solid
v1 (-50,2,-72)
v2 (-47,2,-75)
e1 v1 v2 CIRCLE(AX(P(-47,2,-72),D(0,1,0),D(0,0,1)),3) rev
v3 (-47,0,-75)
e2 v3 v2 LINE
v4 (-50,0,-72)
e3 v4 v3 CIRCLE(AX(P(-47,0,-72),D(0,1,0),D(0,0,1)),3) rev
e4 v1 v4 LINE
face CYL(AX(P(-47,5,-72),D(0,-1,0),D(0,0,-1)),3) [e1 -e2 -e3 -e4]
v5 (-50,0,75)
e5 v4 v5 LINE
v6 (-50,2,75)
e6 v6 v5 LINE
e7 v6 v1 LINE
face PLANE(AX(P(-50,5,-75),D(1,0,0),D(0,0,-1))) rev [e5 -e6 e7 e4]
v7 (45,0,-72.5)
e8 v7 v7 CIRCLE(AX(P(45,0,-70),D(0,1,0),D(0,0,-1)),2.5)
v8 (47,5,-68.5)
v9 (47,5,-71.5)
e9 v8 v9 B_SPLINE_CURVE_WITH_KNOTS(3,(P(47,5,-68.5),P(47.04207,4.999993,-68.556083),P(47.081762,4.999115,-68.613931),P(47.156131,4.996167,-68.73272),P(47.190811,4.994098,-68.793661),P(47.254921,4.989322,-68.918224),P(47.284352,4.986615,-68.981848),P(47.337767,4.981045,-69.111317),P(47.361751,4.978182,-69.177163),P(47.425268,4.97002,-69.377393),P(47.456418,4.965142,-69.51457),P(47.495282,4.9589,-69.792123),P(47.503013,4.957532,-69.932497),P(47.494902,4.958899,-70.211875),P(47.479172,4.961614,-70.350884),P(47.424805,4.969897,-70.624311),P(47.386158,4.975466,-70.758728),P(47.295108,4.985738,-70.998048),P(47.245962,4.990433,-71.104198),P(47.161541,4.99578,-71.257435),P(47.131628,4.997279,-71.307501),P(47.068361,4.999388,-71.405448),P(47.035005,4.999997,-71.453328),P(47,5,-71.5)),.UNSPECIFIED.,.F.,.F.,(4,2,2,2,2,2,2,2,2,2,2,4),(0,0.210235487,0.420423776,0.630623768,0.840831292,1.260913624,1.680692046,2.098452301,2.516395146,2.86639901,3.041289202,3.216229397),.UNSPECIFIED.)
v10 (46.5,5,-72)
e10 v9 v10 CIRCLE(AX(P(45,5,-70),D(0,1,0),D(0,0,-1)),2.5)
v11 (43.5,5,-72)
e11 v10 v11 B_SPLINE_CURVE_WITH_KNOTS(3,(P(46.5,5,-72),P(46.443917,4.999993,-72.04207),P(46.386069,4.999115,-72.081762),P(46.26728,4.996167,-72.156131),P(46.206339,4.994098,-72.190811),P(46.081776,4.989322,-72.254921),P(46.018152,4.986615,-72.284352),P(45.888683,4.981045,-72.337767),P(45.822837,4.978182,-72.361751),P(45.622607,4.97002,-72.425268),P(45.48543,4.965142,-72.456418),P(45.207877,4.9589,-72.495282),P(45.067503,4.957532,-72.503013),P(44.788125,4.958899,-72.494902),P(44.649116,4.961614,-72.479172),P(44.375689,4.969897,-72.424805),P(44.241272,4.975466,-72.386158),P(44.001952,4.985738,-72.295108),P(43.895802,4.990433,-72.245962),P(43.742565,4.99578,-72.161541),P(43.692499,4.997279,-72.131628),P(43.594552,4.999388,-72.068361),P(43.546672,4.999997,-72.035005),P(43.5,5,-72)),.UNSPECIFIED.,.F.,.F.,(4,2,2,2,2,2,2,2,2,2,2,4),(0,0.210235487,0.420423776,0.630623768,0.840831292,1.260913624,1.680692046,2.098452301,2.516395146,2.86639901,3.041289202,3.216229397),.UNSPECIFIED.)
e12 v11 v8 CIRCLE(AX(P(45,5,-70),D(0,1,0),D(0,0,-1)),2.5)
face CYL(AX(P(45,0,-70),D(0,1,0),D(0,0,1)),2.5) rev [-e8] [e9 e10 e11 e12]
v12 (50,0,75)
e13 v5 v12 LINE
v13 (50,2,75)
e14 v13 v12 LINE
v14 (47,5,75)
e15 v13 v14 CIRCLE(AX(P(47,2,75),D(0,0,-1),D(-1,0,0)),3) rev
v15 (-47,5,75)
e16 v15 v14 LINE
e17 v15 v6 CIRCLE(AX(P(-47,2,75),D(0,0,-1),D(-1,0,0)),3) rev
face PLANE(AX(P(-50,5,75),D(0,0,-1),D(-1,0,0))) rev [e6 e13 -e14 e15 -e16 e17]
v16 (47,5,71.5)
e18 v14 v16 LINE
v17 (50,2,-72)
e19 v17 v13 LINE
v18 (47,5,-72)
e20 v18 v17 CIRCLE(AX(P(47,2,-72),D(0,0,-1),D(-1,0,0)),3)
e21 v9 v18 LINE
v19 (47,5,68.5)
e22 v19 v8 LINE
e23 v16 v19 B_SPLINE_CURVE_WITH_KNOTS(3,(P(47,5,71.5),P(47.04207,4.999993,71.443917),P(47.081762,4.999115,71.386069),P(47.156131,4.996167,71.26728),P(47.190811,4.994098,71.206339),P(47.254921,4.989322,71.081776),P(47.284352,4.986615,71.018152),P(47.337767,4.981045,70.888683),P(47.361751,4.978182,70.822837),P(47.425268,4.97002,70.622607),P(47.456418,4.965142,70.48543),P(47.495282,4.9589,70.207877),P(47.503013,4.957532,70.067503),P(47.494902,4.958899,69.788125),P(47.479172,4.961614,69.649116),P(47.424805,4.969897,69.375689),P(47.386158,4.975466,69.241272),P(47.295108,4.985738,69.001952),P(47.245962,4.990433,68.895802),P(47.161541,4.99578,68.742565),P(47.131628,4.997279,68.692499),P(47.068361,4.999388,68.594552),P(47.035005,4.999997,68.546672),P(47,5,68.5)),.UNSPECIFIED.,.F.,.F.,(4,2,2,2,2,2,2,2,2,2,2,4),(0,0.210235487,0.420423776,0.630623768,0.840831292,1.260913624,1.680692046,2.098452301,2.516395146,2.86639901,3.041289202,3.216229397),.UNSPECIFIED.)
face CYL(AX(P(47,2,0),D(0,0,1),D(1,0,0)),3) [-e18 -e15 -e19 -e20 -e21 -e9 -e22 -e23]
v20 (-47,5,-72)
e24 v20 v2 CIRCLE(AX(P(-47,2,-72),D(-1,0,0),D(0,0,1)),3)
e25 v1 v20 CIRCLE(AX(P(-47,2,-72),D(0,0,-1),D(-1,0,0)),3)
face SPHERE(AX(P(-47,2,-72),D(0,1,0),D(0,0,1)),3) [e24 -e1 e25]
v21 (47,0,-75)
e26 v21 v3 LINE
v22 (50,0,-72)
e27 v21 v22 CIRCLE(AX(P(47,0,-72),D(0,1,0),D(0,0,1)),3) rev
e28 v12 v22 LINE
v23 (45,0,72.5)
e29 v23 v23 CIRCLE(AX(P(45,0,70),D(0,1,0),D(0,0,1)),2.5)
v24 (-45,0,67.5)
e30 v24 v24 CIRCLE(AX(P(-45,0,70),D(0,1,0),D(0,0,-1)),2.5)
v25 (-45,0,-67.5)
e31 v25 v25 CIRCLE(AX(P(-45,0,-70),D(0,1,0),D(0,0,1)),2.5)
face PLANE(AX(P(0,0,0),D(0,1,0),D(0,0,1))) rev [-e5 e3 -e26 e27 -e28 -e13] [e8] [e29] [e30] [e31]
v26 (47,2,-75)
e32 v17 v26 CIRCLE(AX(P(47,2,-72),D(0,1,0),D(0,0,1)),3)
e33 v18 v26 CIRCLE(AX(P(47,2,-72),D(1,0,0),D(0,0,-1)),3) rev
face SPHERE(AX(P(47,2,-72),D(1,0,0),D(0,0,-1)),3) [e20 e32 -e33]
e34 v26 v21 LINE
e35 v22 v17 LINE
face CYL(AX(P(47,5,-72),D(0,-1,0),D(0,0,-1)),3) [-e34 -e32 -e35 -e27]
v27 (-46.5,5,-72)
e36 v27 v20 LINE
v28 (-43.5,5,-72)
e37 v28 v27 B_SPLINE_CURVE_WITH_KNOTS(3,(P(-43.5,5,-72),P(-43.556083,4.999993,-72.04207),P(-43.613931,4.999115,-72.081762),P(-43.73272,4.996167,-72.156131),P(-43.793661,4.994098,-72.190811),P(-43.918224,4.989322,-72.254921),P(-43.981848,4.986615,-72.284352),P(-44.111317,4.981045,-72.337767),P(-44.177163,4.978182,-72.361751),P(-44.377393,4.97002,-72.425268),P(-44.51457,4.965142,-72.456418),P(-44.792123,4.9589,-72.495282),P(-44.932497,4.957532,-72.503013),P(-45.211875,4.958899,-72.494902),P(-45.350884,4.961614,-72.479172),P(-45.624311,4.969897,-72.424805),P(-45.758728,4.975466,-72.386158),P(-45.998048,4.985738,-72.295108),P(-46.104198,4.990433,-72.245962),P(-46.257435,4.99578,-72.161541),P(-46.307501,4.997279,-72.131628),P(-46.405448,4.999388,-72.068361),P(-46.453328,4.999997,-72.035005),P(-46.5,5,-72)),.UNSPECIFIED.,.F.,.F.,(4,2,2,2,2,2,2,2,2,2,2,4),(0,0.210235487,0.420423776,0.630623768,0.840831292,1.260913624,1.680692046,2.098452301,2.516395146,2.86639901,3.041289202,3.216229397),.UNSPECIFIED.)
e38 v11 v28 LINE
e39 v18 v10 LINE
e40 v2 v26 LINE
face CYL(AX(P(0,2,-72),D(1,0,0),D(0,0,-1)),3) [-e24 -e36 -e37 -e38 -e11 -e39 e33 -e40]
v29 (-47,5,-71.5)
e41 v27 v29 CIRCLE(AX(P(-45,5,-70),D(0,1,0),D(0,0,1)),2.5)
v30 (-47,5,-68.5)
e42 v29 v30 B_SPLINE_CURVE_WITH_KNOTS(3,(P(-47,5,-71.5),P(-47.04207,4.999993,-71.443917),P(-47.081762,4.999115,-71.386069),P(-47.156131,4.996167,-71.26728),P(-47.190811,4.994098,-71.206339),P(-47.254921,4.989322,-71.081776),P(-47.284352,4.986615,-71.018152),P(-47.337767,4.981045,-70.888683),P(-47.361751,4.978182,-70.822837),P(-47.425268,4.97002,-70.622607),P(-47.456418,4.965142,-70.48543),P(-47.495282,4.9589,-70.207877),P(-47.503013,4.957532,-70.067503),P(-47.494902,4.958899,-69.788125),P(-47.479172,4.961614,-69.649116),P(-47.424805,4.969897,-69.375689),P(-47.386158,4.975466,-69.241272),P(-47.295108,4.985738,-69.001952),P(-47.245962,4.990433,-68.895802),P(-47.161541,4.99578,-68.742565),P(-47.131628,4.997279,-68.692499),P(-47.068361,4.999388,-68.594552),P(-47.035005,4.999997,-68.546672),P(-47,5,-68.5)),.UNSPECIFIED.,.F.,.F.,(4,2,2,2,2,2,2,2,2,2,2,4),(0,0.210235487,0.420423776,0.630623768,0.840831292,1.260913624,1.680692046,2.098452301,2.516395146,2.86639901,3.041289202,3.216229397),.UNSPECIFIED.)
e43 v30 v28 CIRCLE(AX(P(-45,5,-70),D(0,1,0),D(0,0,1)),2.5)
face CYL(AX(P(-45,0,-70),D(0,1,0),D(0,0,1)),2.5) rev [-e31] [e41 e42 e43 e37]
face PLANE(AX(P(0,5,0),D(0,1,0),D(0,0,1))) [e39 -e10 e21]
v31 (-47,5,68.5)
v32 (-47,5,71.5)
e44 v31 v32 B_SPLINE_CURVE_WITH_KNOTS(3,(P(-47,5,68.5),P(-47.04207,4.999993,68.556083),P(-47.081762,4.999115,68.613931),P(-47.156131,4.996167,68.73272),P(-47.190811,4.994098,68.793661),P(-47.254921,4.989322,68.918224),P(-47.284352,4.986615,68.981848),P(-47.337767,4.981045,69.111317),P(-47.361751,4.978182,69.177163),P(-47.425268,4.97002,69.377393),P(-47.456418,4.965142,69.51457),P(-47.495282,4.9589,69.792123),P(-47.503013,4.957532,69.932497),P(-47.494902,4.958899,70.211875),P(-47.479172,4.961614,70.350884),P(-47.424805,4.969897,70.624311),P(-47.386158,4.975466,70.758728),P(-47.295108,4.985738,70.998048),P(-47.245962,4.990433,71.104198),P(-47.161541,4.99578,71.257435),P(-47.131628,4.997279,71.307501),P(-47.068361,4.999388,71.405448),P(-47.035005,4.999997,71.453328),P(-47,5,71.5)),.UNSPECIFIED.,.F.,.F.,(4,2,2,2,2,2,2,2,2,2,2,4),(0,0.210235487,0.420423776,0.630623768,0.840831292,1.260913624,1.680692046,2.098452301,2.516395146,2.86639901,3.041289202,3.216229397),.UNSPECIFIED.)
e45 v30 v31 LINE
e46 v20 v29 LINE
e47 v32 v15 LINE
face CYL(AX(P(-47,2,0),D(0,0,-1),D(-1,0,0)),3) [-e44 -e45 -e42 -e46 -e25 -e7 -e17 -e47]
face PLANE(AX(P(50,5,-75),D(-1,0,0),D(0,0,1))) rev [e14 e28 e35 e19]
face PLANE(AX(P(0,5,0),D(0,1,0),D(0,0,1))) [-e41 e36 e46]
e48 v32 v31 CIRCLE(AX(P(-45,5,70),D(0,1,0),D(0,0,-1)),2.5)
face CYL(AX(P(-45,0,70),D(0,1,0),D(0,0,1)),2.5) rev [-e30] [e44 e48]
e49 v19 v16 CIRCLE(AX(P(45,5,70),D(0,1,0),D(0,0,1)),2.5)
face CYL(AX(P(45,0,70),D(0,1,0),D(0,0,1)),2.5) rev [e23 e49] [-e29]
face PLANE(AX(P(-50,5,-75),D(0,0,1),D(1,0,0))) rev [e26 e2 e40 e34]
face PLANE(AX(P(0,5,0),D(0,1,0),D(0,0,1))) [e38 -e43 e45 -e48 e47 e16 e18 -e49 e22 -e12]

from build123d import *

# Parameters (mm, degrees)
SKETCH1_W           = 100
SKETCH1_H           = 150
BOSS_EXTRUDE1_DEPTH = 5
SKETCH2_R           = 2.5
CUT_EXTRUDE1_DEPTH  = 91.277350426
FILLET1_R           = 3


with BuildPart() as part:
    # Sketch1 → Boss-Extrude1 (new body)
    with BuildSketch(Plane(origin=(0, 0, 0), x_dir=(1, 0, 0), z_dir=(0, 1, 0))):
        Rectangle(SKETCH1_W, SKETCH1_H)
    extrude(amount=BOSS_EXTRUDE1_DEPTH)

    # Sketch2 → Cut-Extrude1 (cut, through all)
    with BuildSketch(Plane(origin=(0, 5, 0), x_dir=(1, 0, 0), z_dir=(0, 1, 0))):
        with Locations(Location((-45, 70, 0), (0, 0, 270))):
            Circle(SKETCH2_R)
        with Locations(Location((45, 70, 0), (0, 0, 90))):
            Circle(SKETCH2_R)
        with Locations(Location((45, -70, 0), (0, 0, 270))):
            Circle(SKETCH2_R)
        with Locations(Location((-45, -70, 0), (0, 0, 90))):
            Circle(SKETCH2_R)
    extrude(amount=-CUT_EXTRUDE1_DEPTH, mode=Mode.SUBTRACT)

    # Fillet1
    # the kernel refuses this fillet: 3 mm, written as the material it takes off along each edge
    with BuildSketch(Plane(origin=(-47, 2, -72), x_dir=(-1, 0, 0), z_dir=(0, 0, -1))) as fillet1_piece_1_section:
        Polygon((0, 0), (FILLET1_R, 0), (FILLET1_R, FILLET1_R), (0, FILLET1_R), align=None)
    fillet1_piece_1 = extrude(amount=FILLET1_R, mode=Mode.PRIVATE)
    fillet1_piece_1 = fillet1_piece_1 - Plane(origin=(-47, 2, -72), x_dir=(0.7071067811865475, -0.7071067811865475, 0), z_dir=(0, 0, -1)) * Sphere(FILLET1_R, mode=Mode.PRIVATE)
    add(fillet1_piece_1, mode=Mode.SUBTRACT)
    with BuildSketch(Plane(origin=(47, 2, -72), x_dir=(1, 0, 0), z_dir=(0, 0, -1))) as fillet1_piece_2_section:
        Polygon((0, 0), (FILLET1_R, 0), (FILLET1_R, -FILLET1_R), (0, -FILLET1_R), align=None)
    fillet1_piece_2 = extrude(amount=FILLET1_R, mode=Mode.PRIVATE)
    fillet1_piece_2 = fillet1_piece_2 - Plane(origin=(47, 2, -72), x_dir=(-0.7071067811865475, -0.7071067811865475, 0), z_dir=(0, 0, -1)) * Sphere(FILLET1_R, mode=Mode.PRIVATE)
    add(fillet1_piece_2, mode=Mode.SUBTRACT)
    with BuildSketch(Plane(origin=(-50, 5, 82.5), x_dir=(0, -1, 0), z_dir=(0, 0, -1)), Plane(origin=(50, 5, -72), x_dir=(0, -1, 0), z_dir=(0, 0, 1))) as fillet1_piece_3:
        with BuildLine():
            CenterArc((FILLET1_R, -FILLET1_R), FILLET1_R, 90, 90)
            Line((0, -FILLET1_R), (0, 0))
            Line((0, 0), (FILLET1_R, 0))
        make_face()
    extrude(amount=154.5, mode=Mode.SUBTRACT)
    with BuildSketch(Plane(origin=(-50, -7.5, -75), x_dir=(1, 0, 0), z_dir=(0, 1, 0))) as fillet1_piece_4:
        with BuildLine():
            CenterArc((FILLET1_R, -FILLET1_R), FILLET1_R, 90, 90)
            Line((0, -FILLET1_R), (0, 0))
            Line((0, 0), (FILLET1_R, 0))
        make_face()
    extrude(amount=9.5, mode=Mode.SUBTRACT)
    with BuildSketch(Plane(origin=(50, -7.5, -75), x_dir=(-1, 0, 0), z_dir=(0, 1, 0))) as fillet1_piece_5:
        with BuildLine():
            CenterArc((FILLET1_R, FILLET1_R), FILLET1_R, 180, 90)
            Line((0, FILLET1_R), (0, 0))
            Line((0, 0), (FILLET1_R, 0))
        make_face()
    extrude(amount=9.5, mode=Mode.SUBTRACT)
    with BuildSketch(Plane(origin=(-47, 5, -75), x_dir=(0, -1, 0), z_dir=(1, 0, 0))) as fillet1_piece_6:
        with BuildLine():
            CenterArc((FILLET1_R, -FILLET1_R), FILLET1_R, 90, 90)
            Line((0, -FILLET1_R), (0, 0))
            Line((0, 0), (FILLET1_R, 0))
        make_face()
    extrude(amount=94, mode=Mode.SUBTRACT)


solid = part.part
